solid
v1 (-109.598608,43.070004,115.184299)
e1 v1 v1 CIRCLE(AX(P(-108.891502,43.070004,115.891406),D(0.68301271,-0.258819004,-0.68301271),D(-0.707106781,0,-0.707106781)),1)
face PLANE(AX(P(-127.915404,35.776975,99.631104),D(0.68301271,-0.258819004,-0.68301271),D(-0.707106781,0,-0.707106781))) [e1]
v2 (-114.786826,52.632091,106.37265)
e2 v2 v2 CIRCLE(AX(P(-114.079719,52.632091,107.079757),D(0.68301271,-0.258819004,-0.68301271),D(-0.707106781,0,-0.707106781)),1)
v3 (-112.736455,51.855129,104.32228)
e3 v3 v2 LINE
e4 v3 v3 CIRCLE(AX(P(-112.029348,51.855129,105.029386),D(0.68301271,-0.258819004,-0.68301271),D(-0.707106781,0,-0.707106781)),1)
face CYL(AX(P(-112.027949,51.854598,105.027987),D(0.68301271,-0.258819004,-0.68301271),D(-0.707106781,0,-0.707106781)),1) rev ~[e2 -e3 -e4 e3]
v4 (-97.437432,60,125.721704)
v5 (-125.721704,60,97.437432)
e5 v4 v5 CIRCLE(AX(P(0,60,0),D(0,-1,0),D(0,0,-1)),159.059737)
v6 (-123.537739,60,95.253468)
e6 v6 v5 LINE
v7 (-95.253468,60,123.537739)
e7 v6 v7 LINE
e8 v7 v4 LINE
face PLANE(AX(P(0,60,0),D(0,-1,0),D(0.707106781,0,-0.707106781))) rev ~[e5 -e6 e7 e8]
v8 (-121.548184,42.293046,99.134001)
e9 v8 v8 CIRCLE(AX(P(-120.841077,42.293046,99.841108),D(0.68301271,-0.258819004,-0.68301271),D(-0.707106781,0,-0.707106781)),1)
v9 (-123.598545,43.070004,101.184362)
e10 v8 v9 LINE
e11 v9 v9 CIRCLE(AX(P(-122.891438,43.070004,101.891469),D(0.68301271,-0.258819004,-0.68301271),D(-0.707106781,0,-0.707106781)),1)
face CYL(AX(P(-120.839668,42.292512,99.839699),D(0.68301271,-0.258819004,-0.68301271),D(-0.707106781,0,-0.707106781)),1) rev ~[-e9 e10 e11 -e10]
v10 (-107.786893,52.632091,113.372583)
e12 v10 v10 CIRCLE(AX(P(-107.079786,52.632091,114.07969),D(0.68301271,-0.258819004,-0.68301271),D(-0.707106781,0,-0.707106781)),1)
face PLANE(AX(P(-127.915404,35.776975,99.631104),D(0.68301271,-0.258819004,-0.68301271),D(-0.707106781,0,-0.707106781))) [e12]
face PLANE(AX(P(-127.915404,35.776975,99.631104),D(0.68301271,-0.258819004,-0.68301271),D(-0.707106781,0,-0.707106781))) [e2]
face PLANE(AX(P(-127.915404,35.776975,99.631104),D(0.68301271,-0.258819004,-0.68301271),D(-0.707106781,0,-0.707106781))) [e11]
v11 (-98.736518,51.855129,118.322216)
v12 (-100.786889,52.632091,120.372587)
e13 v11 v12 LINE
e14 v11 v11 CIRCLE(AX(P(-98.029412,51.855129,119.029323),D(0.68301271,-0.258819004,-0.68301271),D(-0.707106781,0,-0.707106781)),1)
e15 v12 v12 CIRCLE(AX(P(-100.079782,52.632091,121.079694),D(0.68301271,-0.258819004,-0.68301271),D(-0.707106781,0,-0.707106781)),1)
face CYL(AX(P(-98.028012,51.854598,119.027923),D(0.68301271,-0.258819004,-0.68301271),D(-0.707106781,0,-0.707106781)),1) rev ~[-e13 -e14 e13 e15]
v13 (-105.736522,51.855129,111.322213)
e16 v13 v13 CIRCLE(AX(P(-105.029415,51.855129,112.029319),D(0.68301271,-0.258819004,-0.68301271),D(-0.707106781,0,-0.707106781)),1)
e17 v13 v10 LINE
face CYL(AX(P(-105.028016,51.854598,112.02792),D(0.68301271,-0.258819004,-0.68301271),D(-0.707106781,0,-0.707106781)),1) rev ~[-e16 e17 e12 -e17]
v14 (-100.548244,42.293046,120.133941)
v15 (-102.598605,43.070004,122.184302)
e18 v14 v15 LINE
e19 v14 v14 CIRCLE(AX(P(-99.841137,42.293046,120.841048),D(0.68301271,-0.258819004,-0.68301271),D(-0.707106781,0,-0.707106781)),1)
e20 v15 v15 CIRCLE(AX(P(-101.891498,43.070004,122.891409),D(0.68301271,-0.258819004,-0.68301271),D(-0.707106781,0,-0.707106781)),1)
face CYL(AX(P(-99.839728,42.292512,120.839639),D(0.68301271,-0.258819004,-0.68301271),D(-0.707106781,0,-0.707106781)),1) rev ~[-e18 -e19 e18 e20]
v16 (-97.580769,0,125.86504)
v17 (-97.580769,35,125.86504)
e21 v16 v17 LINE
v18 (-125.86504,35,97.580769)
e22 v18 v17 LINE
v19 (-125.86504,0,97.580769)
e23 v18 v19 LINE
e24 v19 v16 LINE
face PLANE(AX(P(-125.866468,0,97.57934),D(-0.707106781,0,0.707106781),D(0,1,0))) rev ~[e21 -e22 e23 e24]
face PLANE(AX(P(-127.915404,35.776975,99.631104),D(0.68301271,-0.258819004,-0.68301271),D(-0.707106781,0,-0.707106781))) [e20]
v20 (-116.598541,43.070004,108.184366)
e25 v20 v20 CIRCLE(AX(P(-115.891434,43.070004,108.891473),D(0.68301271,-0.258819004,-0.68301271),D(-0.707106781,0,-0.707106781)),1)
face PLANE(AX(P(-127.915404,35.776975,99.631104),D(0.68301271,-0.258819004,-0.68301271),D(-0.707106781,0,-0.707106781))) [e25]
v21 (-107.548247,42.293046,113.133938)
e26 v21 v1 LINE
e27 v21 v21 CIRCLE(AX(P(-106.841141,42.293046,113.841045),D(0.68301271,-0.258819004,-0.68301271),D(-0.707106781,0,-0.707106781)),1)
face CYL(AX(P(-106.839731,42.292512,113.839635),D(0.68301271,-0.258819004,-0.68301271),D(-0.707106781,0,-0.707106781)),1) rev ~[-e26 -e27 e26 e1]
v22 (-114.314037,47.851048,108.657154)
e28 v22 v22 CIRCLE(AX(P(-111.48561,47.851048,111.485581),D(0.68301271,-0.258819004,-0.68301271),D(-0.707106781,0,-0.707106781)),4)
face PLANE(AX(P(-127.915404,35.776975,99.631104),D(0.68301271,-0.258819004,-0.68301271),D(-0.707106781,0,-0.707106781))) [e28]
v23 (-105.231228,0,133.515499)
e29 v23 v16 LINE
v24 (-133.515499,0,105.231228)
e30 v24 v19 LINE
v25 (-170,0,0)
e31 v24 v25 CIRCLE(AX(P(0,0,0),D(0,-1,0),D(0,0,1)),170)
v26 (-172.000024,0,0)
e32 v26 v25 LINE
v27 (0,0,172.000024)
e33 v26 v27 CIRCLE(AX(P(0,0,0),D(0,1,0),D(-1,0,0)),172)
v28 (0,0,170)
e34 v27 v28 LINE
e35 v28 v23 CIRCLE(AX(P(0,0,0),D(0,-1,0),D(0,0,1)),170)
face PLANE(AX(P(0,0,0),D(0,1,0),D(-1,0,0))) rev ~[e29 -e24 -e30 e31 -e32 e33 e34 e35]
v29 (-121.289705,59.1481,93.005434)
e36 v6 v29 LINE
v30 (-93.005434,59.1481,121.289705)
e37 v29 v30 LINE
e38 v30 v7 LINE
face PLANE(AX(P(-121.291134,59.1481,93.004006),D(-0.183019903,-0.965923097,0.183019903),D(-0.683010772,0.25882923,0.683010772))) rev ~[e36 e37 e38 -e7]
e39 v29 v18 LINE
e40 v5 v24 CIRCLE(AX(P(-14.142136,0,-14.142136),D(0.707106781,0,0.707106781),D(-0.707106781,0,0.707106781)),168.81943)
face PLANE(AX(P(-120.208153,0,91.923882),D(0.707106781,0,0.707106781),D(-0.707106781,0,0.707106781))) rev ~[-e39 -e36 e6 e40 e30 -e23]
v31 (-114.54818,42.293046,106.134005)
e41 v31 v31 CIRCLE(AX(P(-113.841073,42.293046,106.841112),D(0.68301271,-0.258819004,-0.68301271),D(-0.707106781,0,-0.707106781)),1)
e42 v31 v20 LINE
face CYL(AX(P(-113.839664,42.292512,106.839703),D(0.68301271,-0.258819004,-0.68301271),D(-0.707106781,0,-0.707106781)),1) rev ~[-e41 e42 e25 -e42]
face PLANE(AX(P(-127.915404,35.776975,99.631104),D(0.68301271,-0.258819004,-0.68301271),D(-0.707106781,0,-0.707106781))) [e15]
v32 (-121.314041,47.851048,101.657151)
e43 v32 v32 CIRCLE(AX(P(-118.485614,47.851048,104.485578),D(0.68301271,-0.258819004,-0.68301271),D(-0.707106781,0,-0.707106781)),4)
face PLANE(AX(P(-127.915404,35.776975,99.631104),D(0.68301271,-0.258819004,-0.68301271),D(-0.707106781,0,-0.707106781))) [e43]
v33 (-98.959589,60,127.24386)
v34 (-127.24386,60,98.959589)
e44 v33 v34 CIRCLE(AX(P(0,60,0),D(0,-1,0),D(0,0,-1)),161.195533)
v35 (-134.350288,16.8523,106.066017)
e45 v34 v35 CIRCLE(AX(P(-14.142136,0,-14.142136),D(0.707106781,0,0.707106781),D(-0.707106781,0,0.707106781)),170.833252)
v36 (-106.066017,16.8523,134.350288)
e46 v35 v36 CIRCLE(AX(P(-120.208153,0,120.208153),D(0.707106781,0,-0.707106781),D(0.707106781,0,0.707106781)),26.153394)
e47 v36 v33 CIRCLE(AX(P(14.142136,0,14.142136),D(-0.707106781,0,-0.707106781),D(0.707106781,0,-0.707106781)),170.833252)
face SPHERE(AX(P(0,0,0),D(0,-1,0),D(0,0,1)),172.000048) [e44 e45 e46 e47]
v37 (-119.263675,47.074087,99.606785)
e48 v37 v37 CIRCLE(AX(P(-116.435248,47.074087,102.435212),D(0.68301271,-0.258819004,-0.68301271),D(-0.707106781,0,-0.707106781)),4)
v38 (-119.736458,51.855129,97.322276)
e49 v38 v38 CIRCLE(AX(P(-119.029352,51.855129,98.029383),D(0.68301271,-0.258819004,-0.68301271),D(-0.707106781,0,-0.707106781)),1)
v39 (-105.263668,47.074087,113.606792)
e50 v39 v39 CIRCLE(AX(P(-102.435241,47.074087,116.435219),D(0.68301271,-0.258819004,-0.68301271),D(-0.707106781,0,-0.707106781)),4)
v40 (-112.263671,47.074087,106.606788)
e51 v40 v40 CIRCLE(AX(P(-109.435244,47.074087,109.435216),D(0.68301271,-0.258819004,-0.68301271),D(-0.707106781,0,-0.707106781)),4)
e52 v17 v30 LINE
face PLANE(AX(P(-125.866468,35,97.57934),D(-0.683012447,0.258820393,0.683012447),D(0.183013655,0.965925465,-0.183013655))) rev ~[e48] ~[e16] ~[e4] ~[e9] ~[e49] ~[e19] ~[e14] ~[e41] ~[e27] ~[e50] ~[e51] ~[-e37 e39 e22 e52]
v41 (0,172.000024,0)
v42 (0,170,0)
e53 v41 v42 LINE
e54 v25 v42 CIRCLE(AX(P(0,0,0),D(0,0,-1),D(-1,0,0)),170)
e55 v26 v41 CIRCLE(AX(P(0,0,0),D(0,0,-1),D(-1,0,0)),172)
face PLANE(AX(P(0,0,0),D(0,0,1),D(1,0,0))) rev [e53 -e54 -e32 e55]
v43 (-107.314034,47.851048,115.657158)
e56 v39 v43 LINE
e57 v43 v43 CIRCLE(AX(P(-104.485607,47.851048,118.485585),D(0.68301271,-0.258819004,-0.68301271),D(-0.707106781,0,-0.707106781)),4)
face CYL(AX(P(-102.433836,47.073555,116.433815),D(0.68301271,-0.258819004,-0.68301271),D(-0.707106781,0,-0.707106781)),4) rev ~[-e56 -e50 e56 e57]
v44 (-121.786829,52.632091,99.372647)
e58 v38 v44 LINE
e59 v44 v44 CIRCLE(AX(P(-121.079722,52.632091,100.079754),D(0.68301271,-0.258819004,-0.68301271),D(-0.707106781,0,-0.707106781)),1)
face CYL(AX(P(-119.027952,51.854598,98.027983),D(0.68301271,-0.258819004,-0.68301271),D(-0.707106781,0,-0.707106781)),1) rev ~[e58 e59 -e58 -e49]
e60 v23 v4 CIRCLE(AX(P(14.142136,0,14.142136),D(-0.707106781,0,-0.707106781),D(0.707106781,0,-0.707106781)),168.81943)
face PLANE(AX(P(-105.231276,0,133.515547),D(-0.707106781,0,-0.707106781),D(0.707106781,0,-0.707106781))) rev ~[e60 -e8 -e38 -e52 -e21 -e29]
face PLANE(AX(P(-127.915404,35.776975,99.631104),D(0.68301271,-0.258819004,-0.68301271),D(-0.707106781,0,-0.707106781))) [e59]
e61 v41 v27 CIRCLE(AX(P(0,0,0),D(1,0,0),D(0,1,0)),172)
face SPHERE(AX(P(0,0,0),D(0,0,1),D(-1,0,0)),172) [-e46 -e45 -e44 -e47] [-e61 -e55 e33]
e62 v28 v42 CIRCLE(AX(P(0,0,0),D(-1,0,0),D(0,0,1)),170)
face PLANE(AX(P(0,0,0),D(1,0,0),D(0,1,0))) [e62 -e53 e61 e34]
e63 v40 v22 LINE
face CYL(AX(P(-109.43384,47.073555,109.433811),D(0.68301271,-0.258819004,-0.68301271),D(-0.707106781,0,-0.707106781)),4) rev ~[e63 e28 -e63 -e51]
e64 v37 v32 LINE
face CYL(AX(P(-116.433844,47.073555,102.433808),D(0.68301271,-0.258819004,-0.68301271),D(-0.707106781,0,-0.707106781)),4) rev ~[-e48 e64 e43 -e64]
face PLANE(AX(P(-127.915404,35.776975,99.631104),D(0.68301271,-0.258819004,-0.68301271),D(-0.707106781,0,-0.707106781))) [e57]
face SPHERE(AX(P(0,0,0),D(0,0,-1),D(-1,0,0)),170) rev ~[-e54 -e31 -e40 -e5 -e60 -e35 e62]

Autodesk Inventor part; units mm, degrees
ref_plane "YZ Plane" through (0, 0, 0) normal (1, 0, 0) x (0, 1, 0)
ref_plane "XZ Plane" through (0, 0, 0) normal (0, 1, 0) x (-1, 0, 0)
ref_plane "XY Plane" through (0, 0, 0) normal (0, 0, 1) x (1, 0, 0)
sketch "Sketch1" plane through (0, 0, 0) normal (0, 1, 0) x (-1, 0, 0)
  arc A0 (172, 0) -> (0, 172) centre (0, 0) ccw
  line L0 (0, 172) -> (0, 0)
  line L1 (172, 0) -> (0, 0)
revolve "Revolution1" add sketch "Sketch1" angle 90 about axis through (0, 0, 172) along (0, 0, -1)
sketch "Sketch2" plane through (-172, 0, 0) normal (0, -1, 0) x (1, 0, 0)
  arc A0 (172, 170) -> (2, 0) centre (172, 0) ccw
  line L0 (172, 0) -> (172, 172) projected
  line L1 (172, 0) -> (2, 0)
  line L2 (172, 0) -> (172, 170)
revolve "Revolution2" cut sketch "Sketch2" angle 90 about axis through (0, 0, 0) along (0, 0, -1)
sketch "Sketch4" plane through (0, 0, 0) normal (0, -1, 0) x (0.7071068, 0, -0.7071068)
  arc A0 (-120.2082, 120.2082) -> (-120.2082, -120.2082) centre (0, 0) ccw projected
  line L0 (-170, 0) -> (-150, 0)
  line L1 (-150, 0) -> (-150, -20)
  line L2 (-150, 0) -> (-150, 20)
  line L3 (-150, -20) -> (-170, -20)
  line L4 (-170, -20) -> (-170, 20)
  line L5 (-170, 20) -> (-150, 20)
  dimension "d34" = 20
  dimension "d35" = 20
  dimension "d36" = 20
  dimension "d56" = 20
  dimension "d57" = 40
extrude "Extrusion2" add sketch "Sketch4" against normal blind 60
sketch "Sketch6" plane through (0, 0, 0) normal (1, 0, 0) x (0, -0.7071068, -0.7071068)
  line L0 (-120.2082, 120.2082) -> (0, 0) projected
  line L1 (-120.2082, -120.2082) -> (-121.6224, -121.6224) projected
  arc A0 (-121.6224, 121.6224) -> (-121.6224, -121.6224) centre (0, 0) ccw
  line L2 (0, 0) -> (-120.2082, -120.2082) projected
  arc A1 (-134.3503, 134.3503) -> (-134.3503, -134.3503) centre (0, 0) ccw
  line L3 (-121.6224, 121.6224) -> (-134.3503, 134.3503)
  line L4 (-121.6224, -121.6224) -> (-134.3503, -134.3503)
  point P0 (-74.4097, -74.4097)
revolve "Revolution3" cut sketch "Sketch6" angle 90 about axis through (0, 170, 0) along (0, -1, 0)
sketch "Sketch9" plane through (-120.2082, 0, 91.9239) normal (-0.7071068, 0, -0.7071068) x (-0.7071068, 0, 0.7071068)
  line L0 (0, 0) -> (0, 60) projected
  line L1 (0, 0) -> (8, 0)
  line L2 (18.8194, 0) -> (0, 0) projected
  line L3 (8, 0) -> (8, 35)
  line L4 (8, 35) -> (1.5295, 59.1481)
  line L5 (1.5295, 59.1481) -> (4.7087, 60)
  line L6 (0, 60) -> (7.7973, 60) projected
  line L7 (4.7087, 60) -> (0, 60)
  line L8 (0, 60) -> (0, 0)
  point P0 (-150, 0)
  dimension "d58" = 8
  dimension "d59" = 35
  dimension "d60" = 25
  dimension "d61" = 165
extrude "Extrusion5" cut sketch "Sketch9" against normal blind 40
sketch "Sketch10" plane through (-125.865, 35, 97.5807) normal (0.6830127, -0.258819, -0.6830127) x (-0.7071068, 0, -0.7071068)
  line L0 (0, 25) -> (0, 0) projected
  line L1 (0, 25) -> (-40, 25) projected
  line L2 (-40, 0) -> (-40, 25) projected
  line L3 (-40, 25) -> (0, 25) projected
  circle A0 centre (-20, 12.5) radius 4
  circle A1 centre (-15.0503, 7.5503) radius 1
  circle A2 centre (-24.9497, 7.5503) radius 1
  circle A3 centre (-24.9497, 17.4497) radius 1
  circle A4 centre (-15.0503, 17.4497) radius 1
  line L4 (-24.9497, 7.5503) -> (-10.9497, 7.5503) construction
  circle A5 centre (-29.8995, 12.5) radius 4
  circle A6 centre (-34.8492, 7.5503) radius 1
  circle A7 centre (-34.8492, 17.4497) radius 1
  line L5 (-15.0503, 17.4497) -> (-1.0503, 17.4497) construction
  line L6 (-15.0503, 7.5503) -> (-1.0503, 7.5503) construction
  circle A8 centre (-10.1005, 12.5) radius 4
  circle A9 centre (-5.1508, 7.5503) radius 1
  circle A10 centre (-5.1508, 17.4497) radius 1
  dimension "d64" = 8
  dimension "d68" = 2
  dimension "d69" = 2
  dimension "d70" = 2
  dimension "d72" = 2
  dimension "d76" = 8
  dimension "d77" = 2
  dimension "d78" = 2
  dimension "d83" = 8
  dimension "d84" = 2
  dimension "d85" = 2
extrude "Extrusion6" cut sketch "Sketch10" against normal blind 3
properties part number "shell" material "Glass"
